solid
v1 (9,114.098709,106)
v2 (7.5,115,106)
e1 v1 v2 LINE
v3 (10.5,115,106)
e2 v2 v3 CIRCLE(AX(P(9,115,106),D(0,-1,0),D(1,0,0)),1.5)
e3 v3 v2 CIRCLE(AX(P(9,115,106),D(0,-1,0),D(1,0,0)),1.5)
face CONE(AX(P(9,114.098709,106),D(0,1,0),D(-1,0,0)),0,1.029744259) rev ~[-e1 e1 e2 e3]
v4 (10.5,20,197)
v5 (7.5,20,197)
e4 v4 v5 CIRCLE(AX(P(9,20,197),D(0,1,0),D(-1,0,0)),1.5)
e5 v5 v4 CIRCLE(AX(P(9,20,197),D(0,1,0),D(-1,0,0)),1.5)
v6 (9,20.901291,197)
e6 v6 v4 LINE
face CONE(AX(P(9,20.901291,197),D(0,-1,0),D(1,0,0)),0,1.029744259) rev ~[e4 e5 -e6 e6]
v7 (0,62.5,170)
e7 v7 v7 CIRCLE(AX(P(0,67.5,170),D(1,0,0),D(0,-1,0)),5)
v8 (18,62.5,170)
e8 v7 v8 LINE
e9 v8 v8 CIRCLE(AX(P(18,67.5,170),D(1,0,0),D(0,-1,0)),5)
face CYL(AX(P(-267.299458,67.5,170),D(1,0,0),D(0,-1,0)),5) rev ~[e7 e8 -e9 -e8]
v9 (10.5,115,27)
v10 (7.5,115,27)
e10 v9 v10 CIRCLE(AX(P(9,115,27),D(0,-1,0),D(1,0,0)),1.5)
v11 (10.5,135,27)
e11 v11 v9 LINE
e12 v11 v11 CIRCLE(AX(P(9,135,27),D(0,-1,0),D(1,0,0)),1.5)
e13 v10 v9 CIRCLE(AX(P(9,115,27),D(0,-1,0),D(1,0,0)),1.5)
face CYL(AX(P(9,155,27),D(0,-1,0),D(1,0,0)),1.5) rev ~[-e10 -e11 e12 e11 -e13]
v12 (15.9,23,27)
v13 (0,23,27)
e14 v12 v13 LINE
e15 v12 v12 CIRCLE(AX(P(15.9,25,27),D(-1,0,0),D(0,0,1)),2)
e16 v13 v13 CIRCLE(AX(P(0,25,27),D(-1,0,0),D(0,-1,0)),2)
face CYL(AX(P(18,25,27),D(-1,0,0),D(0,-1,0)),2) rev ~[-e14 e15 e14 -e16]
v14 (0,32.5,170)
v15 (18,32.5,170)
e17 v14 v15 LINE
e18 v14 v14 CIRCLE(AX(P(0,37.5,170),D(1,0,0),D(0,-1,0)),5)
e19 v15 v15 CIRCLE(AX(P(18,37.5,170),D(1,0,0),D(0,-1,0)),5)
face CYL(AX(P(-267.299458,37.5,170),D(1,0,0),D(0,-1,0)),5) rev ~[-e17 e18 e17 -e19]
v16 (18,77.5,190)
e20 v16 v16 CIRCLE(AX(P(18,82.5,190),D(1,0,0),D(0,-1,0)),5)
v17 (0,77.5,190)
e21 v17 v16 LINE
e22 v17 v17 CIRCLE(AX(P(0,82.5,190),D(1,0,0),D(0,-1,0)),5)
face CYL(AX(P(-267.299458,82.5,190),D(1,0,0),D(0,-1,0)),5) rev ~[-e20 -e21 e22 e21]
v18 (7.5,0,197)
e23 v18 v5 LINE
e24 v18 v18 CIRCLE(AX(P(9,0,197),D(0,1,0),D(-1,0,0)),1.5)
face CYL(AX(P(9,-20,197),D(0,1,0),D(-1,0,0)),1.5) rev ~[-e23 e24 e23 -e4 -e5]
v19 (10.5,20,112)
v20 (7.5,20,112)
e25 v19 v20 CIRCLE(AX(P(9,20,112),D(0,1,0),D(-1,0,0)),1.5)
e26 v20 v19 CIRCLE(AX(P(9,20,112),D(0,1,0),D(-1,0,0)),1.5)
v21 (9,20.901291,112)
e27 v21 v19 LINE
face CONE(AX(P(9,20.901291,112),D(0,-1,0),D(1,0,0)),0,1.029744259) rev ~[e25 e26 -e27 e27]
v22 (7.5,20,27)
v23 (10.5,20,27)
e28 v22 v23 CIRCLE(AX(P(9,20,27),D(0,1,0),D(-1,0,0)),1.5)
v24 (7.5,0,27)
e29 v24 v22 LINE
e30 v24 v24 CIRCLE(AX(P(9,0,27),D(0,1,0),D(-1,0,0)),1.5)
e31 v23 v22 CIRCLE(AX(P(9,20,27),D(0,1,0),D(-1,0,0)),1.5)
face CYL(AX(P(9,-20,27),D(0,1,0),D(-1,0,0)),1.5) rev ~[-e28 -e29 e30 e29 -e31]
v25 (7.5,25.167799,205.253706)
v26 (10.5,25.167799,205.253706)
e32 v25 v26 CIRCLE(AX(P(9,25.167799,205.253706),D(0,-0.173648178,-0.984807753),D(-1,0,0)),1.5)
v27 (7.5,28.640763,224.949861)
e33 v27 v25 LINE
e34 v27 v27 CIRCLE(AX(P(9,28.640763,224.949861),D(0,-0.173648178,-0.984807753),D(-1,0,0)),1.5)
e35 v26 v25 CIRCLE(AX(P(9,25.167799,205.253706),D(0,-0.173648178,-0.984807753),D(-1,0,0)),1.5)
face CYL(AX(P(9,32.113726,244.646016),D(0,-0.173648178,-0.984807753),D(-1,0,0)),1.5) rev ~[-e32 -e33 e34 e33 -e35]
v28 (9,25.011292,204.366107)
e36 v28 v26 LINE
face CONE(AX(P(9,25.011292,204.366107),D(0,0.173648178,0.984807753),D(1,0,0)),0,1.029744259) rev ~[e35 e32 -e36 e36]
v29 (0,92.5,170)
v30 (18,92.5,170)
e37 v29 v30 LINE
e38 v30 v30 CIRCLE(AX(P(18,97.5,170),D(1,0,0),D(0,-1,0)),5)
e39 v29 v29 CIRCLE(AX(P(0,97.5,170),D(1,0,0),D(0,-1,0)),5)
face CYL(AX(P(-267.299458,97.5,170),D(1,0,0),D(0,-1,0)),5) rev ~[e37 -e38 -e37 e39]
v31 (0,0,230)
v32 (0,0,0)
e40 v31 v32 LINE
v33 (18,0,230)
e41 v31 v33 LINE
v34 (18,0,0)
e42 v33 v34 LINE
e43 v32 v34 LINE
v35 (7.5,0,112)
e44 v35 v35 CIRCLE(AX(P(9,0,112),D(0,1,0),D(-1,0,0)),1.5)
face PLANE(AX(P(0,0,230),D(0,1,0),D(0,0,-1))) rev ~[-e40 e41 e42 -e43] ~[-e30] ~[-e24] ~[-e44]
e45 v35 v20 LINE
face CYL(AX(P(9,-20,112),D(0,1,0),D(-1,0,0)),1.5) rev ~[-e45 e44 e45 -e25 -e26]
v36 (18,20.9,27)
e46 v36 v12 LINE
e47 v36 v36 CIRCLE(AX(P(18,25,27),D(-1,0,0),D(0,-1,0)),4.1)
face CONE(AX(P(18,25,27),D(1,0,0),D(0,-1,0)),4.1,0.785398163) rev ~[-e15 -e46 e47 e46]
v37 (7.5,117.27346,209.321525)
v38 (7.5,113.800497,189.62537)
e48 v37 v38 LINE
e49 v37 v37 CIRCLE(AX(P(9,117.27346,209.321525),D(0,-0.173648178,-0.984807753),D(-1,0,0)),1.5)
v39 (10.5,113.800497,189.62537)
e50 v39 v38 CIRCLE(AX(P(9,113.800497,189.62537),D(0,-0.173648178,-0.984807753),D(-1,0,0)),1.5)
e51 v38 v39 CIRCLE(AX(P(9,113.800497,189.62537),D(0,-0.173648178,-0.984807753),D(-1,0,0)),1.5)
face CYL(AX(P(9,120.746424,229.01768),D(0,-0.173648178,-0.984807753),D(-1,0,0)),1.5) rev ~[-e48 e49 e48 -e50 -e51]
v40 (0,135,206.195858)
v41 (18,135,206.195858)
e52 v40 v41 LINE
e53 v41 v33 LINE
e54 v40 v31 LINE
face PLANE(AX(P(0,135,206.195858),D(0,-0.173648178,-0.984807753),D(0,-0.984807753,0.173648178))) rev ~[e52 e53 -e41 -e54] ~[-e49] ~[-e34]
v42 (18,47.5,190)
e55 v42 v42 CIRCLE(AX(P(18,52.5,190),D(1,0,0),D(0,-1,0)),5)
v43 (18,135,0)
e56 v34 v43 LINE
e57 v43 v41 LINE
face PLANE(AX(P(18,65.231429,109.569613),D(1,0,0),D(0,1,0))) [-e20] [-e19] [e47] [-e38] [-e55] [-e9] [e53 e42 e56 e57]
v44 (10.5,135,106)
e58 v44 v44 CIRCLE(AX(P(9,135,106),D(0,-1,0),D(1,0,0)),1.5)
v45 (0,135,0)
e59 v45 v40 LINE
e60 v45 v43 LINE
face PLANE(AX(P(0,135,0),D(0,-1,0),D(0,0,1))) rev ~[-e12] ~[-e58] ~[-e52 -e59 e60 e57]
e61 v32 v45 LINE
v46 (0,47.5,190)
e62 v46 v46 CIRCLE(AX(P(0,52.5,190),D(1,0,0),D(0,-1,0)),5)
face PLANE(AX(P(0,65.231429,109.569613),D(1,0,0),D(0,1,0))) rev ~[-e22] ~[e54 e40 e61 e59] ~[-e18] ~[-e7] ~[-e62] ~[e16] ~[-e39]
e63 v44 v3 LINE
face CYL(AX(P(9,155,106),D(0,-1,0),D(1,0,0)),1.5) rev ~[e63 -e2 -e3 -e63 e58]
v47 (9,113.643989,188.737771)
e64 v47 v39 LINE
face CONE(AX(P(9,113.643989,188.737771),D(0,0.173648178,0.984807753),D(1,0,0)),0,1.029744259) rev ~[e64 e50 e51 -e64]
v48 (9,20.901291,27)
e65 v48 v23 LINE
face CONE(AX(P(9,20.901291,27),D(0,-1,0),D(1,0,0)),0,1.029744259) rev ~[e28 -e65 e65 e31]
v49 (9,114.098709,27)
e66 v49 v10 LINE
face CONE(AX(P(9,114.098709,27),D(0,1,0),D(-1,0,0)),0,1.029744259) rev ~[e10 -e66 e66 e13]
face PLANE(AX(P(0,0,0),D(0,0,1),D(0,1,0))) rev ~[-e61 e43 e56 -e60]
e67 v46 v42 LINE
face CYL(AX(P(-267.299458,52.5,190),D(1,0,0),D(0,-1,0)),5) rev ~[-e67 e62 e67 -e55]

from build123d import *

# Parameters (mm, degrees)
F1_DEPTH       = 18
F2_D           = 10
F3_D           = 10
F5_D           = 4
F5_CSINK_D     = 8.2
F5_CSINK_ANGLE = 90
F7_D           = 3
F7_DEPTH       = 20
F7_TIP         = 0.9012909285
F9_D           = 3
F9_DEPTH       = 20
F9_TIP         = 0.9012909285
F11_D          = 3
F11_DEPTH      = 20
F11_TIP        = 0.9012909285


# Not quite as in the source:
# - a feature names something its author has since deleted; it is built from what else it names


with BuildPart() as f1:
    # F0 (on Right) → F1 (new body)
    with BuildSketch(Plane.YZ):
        Polygon((0, 230), (0, 0), (135, 0), (135, 206.1958576044), align=None)
    extrude(amount=F1_DEPTH)

    # F2 (through all)
    with Locations(Plane(origin=(0, 0, 0), x_dir=(0, 1, 0), z_dir=(-1, 0, 0))):
        with Locations((37.5, -170), (67.5, -170), (97.5, -170)):
            Hole(F2_D / 2)

    # F3 (through all)
    with Locations(Plane(origin=(0, 0, 0), x_dir=(0, 1, 0), z_dir=(-1, 0, 0))):
        with Locations((52.5, -190), (82.5, -190)):
            Hole(F3_D / 2)

    # F5 (through all)
    with Locations(Plane.YZ.offset(18)):
        with Locations((25, 27)):
            CounterSinkHole(F5_D / 2, F5_CSINK_D / 2, counter_sink_angle=F5_CSINK_ANGLE)

    # F7
    with Locations(Plane(origin=(0, 135, 0), x_dir=(-1, 0, 0), z_dir=(0, 1, 0))):
        with Locations((-9, 27), (-9, 106)):
            Hole(F7_D / 2, depth=F7_DEPTH)
            with Locations((0, 0, -(F7_DEPTH + F7_TIP / 2))):  # 118° drill point
                Cone(0, F7_D / 2, F7_TIP, mode=Mode.SUBTRACT)

    # F9
    with Locations(Plane.XZ):
        with Locations((9, 197), (9, 112), (9, 27)):
            Hole(F9_D / 2, depth=F9_DEPTH)
            with Locations((0, 0, -(F9_DEPTH + F9_TIP / 2))):  # 118° drill point
                Cone(0, F9_D / 2, F9_TIP, mode=Mode.SUBTRACT)

    # F11
    with Locations(Plane(origin=(0, 39.3323164825, 223.0646513904), x_dir=(1, 0, 0), z_dir=(0, 0.1736481777, 0.984807753))):
        with Locations((9, -10.8564882588), (9, 79.1435117412)):
            Hole(F11_D / 2, depth=F11_DEPTH)
            with Locations((0, 0, -(F11_DEPTH + F11_TIP / 2))):  # 118° drill point
                Cone(0, F11_D / 2, F11_TIP, mode=Mode.SUBTRACT)


solid = f1.part
